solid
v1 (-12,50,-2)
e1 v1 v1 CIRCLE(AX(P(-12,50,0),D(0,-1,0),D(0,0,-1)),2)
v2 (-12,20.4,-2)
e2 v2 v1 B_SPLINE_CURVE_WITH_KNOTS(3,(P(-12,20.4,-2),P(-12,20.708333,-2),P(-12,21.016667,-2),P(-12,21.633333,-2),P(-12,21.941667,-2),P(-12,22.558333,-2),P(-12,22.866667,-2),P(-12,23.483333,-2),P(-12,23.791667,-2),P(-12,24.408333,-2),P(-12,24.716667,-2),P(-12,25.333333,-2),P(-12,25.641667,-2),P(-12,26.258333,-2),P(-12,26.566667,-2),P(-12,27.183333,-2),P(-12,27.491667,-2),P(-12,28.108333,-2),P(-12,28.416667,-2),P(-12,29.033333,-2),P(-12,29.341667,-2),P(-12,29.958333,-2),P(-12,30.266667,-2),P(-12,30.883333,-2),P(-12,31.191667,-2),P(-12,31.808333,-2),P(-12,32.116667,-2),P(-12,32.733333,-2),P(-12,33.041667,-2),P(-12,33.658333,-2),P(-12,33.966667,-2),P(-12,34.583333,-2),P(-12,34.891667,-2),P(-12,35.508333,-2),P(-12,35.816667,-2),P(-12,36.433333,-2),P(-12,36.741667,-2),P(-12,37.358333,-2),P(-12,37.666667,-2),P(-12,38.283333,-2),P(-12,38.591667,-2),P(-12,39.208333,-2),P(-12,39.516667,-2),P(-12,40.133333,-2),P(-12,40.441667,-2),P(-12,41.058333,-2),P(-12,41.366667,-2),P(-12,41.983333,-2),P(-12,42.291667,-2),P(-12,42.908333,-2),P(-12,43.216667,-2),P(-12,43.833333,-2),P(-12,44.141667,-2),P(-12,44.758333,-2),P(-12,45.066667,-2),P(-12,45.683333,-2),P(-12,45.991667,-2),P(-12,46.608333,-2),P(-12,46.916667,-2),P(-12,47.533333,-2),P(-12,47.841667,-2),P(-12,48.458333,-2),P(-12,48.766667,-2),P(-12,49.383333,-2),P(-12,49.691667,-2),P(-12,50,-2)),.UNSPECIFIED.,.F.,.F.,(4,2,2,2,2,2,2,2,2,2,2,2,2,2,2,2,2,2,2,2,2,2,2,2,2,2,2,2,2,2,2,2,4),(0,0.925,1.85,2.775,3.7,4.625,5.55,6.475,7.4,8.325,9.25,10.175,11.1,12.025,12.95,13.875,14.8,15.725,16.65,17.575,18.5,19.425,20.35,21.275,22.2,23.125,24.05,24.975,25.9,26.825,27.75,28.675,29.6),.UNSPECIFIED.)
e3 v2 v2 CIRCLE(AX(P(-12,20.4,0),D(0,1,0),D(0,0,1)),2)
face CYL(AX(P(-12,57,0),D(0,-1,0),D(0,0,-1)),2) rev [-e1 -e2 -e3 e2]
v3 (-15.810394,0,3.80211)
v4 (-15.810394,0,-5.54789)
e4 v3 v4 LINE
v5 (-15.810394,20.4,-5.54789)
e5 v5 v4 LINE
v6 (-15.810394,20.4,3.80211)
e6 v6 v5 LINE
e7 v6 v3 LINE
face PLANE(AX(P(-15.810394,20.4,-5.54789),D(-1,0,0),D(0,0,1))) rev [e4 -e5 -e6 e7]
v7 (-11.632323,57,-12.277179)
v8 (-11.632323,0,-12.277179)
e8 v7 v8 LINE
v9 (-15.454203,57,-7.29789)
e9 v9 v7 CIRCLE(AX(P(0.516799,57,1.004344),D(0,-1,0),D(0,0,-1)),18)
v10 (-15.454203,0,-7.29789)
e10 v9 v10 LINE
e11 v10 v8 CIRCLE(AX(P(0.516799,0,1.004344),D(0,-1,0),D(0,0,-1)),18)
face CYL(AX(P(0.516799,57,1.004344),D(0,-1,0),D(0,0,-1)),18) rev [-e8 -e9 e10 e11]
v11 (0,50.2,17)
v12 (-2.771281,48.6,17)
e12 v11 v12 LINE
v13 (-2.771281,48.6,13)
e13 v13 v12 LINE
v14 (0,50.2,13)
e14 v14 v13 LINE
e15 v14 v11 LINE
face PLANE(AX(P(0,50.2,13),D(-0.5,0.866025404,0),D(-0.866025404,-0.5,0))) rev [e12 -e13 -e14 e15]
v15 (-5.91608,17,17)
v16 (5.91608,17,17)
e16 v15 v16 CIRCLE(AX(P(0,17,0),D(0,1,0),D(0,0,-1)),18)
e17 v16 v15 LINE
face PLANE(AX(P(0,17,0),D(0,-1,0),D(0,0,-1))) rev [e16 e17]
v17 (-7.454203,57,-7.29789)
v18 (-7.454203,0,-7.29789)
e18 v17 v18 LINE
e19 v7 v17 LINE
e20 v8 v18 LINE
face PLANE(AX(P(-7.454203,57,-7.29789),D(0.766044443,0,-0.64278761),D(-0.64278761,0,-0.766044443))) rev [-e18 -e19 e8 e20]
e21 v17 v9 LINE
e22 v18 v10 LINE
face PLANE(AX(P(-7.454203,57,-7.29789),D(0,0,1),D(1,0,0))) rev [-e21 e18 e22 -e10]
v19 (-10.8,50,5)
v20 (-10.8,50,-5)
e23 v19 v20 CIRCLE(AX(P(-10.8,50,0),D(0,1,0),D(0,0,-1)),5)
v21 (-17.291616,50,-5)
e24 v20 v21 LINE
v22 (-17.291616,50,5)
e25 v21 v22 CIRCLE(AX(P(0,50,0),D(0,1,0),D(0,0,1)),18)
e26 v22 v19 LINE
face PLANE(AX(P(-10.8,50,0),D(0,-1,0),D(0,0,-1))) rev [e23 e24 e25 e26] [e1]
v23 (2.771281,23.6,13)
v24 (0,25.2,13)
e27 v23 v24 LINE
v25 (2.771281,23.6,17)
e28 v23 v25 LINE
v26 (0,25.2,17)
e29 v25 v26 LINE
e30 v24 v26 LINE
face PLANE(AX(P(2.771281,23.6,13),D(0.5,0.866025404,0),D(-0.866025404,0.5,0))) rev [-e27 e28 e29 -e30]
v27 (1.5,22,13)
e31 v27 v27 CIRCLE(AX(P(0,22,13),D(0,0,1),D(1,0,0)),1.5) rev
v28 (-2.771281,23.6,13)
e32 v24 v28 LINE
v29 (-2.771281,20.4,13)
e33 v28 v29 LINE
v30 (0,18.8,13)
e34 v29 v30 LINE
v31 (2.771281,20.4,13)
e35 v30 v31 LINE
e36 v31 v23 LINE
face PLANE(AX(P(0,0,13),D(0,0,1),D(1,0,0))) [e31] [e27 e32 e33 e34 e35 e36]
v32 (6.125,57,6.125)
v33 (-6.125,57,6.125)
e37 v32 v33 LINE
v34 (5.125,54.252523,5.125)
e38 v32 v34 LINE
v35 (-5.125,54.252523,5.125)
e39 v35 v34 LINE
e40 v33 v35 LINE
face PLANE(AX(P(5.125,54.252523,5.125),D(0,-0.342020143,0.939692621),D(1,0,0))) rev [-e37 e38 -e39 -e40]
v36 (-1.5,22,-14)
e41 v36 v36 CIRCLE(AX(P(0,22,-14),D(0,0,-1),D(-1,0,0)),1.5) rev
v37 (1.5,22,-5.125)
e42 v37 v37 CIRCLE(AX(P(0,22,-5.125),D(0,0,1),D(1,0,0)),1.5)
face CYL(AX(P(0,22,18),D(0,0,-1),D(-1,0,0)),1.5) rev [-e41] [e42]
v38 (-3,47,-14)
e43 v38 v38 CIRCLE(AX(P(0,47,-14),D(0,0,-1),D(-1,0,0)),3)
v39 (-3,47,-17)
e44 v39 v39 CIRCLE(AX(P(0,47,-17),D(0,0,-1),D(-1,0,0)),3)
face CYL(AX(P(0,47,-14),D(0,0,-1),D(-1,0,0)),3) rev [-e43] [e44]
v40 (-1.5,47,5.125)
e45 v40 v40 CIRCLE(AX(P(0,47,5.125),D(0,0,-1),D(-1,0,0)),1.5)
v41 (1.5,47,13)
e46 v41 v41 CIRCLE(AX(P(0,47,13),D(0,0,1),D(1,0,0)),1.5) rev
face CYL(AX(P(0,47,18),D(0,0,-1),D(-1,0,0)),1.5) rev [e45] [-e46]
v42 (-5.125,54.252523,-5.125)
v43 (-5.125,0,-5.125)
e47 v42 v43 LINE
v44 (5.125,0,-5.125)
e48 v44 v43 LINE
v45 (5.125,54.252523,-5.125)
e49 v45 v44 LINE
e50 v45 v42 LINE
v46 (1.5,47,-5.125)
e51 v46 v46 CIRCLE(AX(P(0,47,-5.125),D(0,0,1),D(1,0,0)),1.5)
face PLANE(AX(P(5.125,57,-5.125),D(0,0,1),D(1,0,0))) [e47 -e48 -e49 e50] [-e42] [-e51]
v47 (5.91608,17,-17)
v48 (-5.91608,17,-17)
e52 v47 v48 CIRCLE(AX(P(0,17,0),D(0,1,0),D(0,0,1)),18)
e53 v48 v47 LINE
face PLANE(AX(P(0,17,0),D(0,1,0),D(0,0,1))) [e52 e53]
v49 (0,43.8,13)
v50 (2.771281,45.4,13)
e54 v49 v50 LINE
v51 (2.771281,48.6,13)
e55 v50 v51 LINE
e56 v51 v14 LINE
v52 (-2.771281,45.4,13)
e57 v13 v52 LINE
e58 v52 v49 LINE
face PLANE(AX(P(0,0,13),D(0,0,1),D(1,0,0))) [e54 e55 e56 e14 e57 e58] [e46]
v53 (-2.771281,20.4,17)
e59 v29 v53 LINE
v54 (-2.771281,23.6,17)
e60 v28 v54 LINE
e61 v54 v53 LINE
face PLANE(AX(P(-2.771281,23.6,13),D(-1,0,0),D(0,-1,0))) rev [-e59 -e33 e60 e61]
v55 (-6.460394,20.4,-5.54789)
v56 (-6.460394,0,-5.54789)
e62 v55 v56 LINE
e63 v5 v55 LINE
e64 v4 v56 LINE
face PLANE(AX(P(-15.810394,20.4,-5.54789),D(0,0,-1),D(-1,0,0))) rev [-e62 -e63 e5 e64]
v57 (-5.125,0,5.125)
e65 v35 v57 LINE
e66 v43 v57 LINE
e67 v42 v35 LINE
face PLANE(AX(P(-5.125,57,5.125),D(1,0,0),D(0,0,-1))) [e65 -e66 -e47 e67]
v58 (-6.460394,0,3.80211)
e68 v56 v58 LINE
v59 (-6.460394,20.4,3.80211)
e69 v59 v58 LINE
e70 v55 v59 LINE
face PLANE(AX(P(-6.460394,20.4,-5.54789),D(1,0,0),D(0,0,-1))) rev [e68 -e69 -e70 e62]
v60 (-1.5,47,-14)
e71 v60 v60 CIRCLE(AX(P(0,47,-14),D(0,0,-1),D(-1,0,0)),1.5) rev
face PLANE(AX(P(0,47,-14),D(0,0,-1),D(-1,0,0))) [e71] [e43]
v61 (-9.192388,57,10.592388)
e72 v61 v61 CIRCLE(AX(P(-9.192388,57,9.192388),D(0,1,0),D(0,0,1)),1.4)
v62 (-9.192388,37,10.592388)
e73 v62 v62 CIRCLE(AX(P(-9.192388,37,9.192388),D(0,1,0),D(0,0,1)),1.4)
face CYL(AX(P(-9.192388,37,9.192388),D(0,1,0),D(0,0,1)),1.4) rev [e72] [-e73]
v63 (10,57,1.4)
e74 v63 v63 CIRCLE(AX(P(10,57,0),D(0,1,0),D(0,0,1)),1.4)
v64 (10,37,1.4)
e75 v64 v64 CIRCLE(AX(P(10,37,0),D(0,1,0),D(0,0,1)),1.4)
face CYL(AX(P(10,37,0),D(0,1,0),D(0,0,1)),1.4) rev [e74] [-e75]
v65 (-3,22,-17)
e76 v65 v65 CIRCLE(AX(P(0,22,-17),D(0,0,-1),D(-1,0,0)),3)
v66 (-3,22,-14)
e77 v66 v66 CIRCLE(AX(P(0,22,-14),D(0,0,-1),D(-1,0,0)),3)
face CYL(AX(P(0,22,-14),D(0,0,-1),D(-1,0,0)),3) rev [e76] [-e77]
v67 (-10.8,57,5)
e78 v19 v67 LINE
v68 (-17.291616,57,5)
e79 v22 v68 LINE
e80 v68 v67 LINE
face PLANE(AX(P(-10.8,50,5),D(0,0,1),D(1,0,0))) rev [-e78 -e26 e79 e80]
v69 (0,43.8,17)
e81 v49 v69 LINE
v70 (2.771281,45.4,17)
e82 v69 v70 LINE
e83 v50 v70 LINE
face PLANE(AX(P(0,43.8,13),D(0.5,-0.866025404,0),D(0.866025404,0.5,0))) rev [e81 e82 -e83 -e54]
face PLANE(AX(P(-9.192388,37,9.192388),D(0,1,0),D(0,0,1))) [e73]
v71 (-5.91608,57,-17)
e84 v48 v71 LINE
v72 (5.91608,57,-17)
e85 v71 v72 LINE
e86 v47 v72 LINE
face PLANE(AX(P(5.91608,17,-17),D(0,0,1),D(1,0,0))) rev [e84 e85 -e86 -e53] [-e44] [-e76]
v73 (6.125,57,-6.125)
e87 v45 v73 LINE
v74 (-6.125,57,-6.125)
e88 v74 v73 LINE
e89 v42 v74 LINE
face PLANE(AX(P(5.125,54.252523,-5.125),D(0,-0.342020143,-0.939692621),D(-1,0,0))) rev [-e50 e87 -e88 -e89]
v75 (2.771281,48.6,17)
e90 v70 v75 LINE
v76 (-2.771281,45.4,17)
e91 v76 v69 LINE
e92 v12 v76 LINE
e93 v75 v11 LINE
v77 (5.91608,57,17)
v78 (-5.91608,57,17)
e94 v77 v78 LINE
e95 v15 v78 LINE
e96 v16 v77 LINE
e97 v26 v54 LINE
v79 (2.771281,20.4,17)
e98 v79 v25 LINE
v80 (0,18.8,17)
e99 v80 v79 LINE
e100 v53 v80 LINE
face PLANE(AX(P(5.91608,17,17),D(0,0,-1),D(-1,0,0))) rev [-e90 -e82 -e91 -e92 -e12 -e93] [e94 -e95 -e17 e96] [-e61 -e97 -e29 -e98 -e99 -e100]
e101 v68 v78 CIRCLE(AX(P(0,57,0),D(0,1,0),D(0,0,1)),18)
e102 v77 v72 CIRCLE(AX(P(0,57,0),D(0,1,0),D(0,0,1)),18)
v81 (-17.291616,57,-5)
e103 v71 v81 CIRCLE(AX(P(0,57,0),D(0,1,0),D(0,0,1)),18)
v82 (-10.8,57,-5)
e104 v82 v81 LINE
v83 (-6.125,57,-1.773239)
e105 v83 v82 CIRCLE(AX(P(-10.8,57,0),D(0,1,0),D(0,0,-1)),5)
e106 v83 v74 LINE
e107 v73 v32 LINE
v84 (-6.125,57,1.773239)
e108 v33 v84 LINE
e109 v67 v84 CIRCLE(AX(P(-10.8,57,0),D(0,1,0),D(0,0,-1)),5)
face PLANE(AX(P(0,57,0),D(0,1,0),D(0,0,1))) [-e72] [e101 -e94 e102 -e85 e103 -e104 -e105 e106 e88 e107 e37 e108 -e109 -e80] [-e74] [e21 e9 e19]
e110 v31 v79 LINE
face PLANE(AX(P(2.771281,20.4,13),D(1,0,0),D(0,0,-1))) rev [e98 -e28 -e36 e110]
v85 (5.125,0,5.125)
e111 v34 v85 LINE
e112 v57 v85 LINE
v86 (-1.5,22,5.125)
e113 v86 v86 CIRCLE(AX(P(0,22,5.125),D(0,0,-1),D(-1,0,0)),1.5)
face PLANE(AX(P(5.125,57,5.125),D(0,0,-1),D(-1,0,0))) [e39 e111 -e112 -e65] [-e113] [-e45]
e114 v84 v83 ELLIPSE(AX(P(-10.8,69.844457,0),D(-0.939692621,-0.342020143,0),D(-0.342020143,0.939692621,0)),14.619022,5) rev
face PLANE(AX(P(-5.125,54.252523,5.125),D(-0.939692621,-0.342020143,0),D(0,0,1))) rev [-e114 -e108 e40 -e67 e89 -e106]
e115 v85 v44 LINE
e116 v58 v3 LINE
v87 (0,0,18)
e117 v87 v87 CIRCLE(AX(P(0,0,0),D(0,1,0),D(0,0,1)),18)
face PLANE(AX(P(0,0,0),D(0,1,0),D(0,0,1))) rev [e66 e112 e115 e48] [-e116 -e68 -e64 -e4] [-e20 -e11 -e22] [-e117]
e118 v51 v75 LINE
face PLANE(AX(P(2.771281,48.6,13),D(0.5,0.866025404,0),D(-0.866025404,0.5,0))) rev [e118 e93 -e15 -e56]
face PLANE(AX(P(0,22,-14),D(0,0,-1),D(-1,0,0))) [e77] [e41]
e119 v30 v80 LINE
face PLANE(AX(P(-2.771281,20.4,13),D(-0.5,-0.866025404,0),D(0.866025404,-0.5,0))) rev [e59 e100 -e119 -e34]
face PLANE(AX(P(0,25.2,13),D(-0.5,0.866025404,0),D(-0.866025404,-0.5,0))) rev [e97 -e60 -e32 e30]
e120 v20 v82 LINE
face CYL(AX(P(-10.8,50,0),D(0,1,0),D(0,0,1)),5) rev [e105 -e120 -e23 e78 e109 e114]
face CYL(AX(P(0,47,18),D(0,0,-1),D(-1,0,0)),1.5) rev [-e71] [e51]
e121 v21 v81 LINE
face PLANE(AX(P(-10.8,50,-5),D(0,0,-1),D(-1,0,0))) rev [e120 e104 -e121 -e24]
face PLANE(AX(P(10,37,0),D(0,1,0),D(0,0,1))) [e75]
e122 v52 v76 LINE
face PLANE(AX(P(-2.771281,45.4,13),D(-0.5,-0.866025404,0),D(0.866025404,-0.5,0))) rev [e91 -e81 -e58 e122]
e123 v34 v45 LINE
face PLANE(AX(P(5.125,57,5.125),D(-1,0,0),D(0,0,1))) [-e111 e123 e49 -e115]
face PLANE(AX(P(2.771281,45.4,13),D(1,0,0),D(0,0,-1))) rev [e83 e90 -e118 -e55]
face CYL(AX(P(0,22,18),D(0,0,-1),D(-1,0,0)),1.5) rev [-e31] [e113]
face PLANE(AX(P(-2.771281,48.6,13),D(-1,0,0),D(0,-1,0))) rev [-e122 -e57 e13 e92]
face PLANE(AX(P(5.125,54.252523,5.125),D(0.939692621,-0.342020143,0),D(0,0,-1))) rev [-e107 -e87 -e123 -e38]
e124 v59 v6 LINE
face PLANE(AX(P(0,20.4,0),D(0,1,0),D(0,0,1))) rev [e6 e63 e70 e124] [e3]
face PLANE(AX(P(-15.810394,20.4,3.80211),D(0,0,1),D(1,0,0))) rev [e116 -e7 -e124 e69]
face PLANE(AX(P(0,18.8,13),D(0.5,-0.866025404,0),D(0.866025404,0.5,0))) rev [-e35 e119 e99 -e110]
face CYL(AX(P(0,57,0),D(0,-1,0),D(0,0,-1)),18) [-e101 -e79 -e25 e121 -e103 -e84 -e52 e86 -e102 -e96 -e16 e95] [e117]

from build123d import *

# Parameters (mm, degrees)
SKETCH1_R           = 18
SKETCH1_R_2         = 2
SKETCH1_W           = 10.25
SKETCH1_H           = 10.25
BOSS_EXTRUDE1_DEPTH = 57
CUT_EXTRUDE1_START  = -7
CUT_EXTRUDE1_DEPTH  = 7
SKETCH4_W           = 9.35
SKETCH4_H           = 9.35
CUT_EXTRUDE3_DEPTH  = 20.4
CUT_EXTRUDE4_START  = -40
CUT_EXTRUDE4_DEPTH  = 40
SKETCH6_R           = 1.5
CUT_EXTRUDE5_DEPTH  = 70.267597042
SKETCH7_R           = 3
CUT_EXTRUDE6_DEPTH  = 3
CUT_EXTRUDE7_DEPTH  = 4
CHAMFER1_SIZE       = 1
CHAMFER1_SIZE_2     = 2.747477419
CUT_EXTRUDE8_DEPTH  = 63.42595614
SKETCH12_R          = 1.4
CUT_EXTRUDE10_DEPTH = 20


with BuildPart() as part:
    # Sketch1 → Boss-Extrude1 (new body)
    with BuildSketch(Plane(origin=(0, 0, 0), x_dir=(1, 0, 0), z_dir=(0, 1, 0))):
        with Locations(Location((0, 0, 0), (0, 0, 90))):
            Circle(SKETCH1_R)
        with Locations(Location((-12, 0, 0), (0, 0, 90))):
            Circle(SKETCH1_R_2, mode=Mode.SUBTRACT)
        Rectangle(SKETCH1_W, SKETCH1_H, mode=Mode.SUBTRACT)
    extrude(amount=BOSS_EXTRUDE1_DEPTH)

    # Sketch2 → Cut-Extrude1 (cut)
    with BuildSketch(Plane(origin=(0, 57, 0), x_dir=(1, 0, 0), z_dir=(0, 1, 0)).offset(CUT_EXTRUDE1_START)):
        with BuildLine():
            Line((-10.8, 5), (-17.291616466, 5))
            ThreePointArc((-17.291616466, 5), (-18, 0), (-17.291616466, -5))
            Line((-17.291616466, -5), (-10.8, -5))
            ThreePointArc((-10.8, -5), (-5.8, 0), (-10.8, 5))
        make_face()
    extrude(amount=CUT_EXTRUDE1_DEPTH, mode=Mode.SUBTRACT)

    # Sketch4 → Cut-Extrude3 (cut)
    with BuildSketch(Plane(origin=(0, 0, 0), x_dir=(-1, 0, 0), z_dir=(0, -1, 0))):
        with Locations((11.135393506, 0.872889968)):
            Rectangle(SKETCH4_W, SKETCH4_H)
    extrude(amount=-CUT_EXTRUDE3_DEPTH, mode=Mode.SUBTRACT)

    # Sketch5 → Cut-Extrude4 (cut)
    with BuildSketch(Plane(origin=(0, 57, 0), x_dir=(1, 0, 0), z_dir=(0, 1, 0)).offset(CUT_EXTRUDE4_START)):
        with BuildLine():
            Line((5.916079783, 17), (-5.916079783, 17))
            ThreePointArc((-5.916079783, 17), (0, 18), (5.916079783, 17))
        make_face()
        with BuildLine():
            Line((5.916079783, -17), (-5.916079783, -17))
            ThreePointArc((-5.916079783, -17), (0, -18), (5.916079783, -17))
        make_face()
    extrude(amount=CUT_EXTRUDE4_DEPTH, mode=Mode.SUBTRACT)

    # Sketch6 → Cut-Extrude5 (cut, through all)
    with BuildSketch(Plane(origin=(0, 0, -17), x_dir=(-1, 0, 0), z_dir=(0, 0, -1))):
        with Locations((0, 47)):
            Circle(SKETCH6_R)
        with Locations((0, 22)):
            Circle(SKETCH6_R)
    extrude(amount=-CUT_EXTRUDE5_DEPTH, mode=Mode.SUBTRACT)

    # Sketch7 → Cut-Extrude6 (cut)
    with BuildSketch(Plane(origin=(0, 0, -17), x_dir=(-1, 0, 0), z_dir=(0, 0, -1))):
        with Locations((0, 47)):
            Circle(SKETCH7_R)
        with Locations((0, 22)):
            Circle(SKETCH7_R)
    extrude(amount=-CUT_EXTRUDE6_DEPTH, mode=Mode.SUBTRACT)

    # Sketch8 → Cut-Extrude7 (cut)
    with BuildSketch(Plane.XY.offset(17)):
        Polygon((0, 43.8), (2.771281292, 45.4), (2.771281292, 48.6), (0, 50.2), (-2.771281292, 48.6), (-2.771281292, 45.4), align=None)
        Polygon((0, 18.8), (2.771281292, 20.4), (2.771281292, 23.6), (0, 25.2), (-2.771281292, 23.6), (-2.771281292, 20.4), align=None)
    extrude(amount=-CUT_EXTRUDE7_DEPTH, mode=Mode.SUBTRACT)

    # Chamfer1
    # the kernel refuses this chamfer: 2.747477419, 1 mm, written as the material it takes off along each edge
    with BuildSketch(Plane(origin=(-5.125, 57, -5.125), x_dir=(0, 0.09904090225204956, -0.9950833631817488), z_dir=(1, 0, 0)), Plane(origin=(-5.125, 57, 5.125), x_dir=(-0.9950833631817488, 0.09904090225204956, 0), z_dir=(0, 0, -1)), Plane(origin=(5.125, 57, 5.125), x_dir=(0, 0.09904090225204956, 0.9950833631817488), z_dir=(-1, 0, 0)), Plane(origin=(5.125, 57, -5.125), x_dir=(0.9950833631817488, 0.09904090225204956, 0), z_dir=(0, 0, 1))) as chamfer1_piece_1:
        Polygon((CHAMFER1_SIZE * 0.995083363182, -CHAMFER1_SIZE * 0.099040902252), (-CHAMFER1_SIZE_2 * 0.0990409022684, -CHAMFER1_SIZE_2 * 0.995083363346), (0, 0), align=None)
    extrude(amount=10.25, mode=Mode.SUBTRACT)
    with BuildSketch(Plane(origin=(-5.125, 57, 5.125), x_dir=(-0.9950833631817488, 0.09904090225204956, 0), z_dir=(0, 0, -1))) as chamfer1_piece_2a_section:
        Polygon((CHAMFER1_SIZE * 0.995083363182, -CHAMFER1_SIZE * 0.099040902252), (-CHAMFER1_SIZE_2 * 0.0990409022684, -CHAMFER1_SIZE_2 * 0.995083363346), (0, 0), align=None)
    chamfer1_piece_2a = extrude(amount=17.377491449, mode=Mode.PRIVATE)
    chamfer1_piece_2a = split(chamfer1_piece_2a, bisect_by=Plane(origin=(-5.432505006, 56.059901151, -5.125), z_dir=(0, 0, -1)), keep=Keep.TOP, mode=Mode.PRIVATE)
    with BuildSketch(Plane(origin=(-12.252491449, 57, -5.125), x_dir=(0, 0.09904090225204956, -0.9950833631817488), z_dir=(1, 0, 0))) as chamfer1_piece_2b_section:
        Polygon((CHAMFER1_SIZE * 0.995083363182, -CHAMFER1_SIZE * 0.099040902252), (-CHAMFER1_SIZE_2 * 0.0990409022684, -CHAMFER1_SIZE_2 * 0.995083363346), (0, 0), align=None)
    chamfer1_piece_2b = extrude(amount=17.377491449, mode=Mode.PRIVATE)
    chamfer1_piece_2b = split(chamfer1_piece_2b, bisect_by=Plane(origin=(-5.125, 56.059901151, -5.432505006), z_dir=(-1, 0, 0)), keep=Keep.TOP, mode=Mode.PRIVATE)
    chamfer1_piece_2 = chamfer1_piece_2a & chamfer1_piece_2b
    add(chamfer1_piece_2, mode=Mode.SUBTRACT)
    with BuildSketch(Plane(origin=(5.125, 57, -12.252491449), x_dir=(0.9950833631817488, 0.09904090225204956, 0), z_dir=(0, 0, 1))) as chamfer1_piece_3a_section:
        Polygon((CHAMFER1_SIZE * 0.995083363182, -CHAMFER1_SIZE * 0.099040902252), (-CHAMFER1_SIZE_2 * 0.0990409022684, -CHAMFER1_SIZE_2 * 0.995083363346), (0, 0), align=None)
    chamfer1_piece_3a = extrude(amount=17.377491449, mode=Mode.PRIVATE)
    chamfer1_piece_3a = split(chamfer1_piece_3a, bisect_by=Plane(origin=(5.432505006, 56.059901151, -5.125), z_dir=(0, 0, -1)), keep=Keep.TOP, mode=Mode.PRIVATE)
    with BuildSketch(Plane(origin=(-5.125, 57, -5.125), x_dir=(0, 0.09904090225204956, -0.9950833631817488), z_dir=(1, 0, 0))) as chamfer1_piece_3b_section:
        Polygon((CHAMFER1_SIZE * 0.995083363182, -CHAMFER1_SIZE * 0.099040902252), (-CHAMFER1_SIZE_2 * 0.0990409022684, -CHAMFER1_SIZE_2 * 0.995083363346), (0, 0), align=None)
    chamfer1_piece_3b = extrude(amount=17.377491449, mode=Mode.PRIVATE)
    chamfer1_piece_3b = split(chamfer1_piece_3b, bisect_by=Plane(origin=(5.125, 56.059901151, -5.432505006), z_dir=(1, 0, 0)), keep=Keep.TOP, mode=Mode.PRIVATE)
    chamfer1_piece_3 = chamfer1_piece_3a & chamfer1_piece_3b
    add(chamfer1_piece_3, mode=Mode.SUBTRACT)
    with BuildSketch(Plane(origin=(5.125, 57, 5.125), x_dir=(0, 0.09904090225204956, 0.9950833631817488), z_dir=(-1, 0, 0))) as chamfer1_piece_4a_section:
        Polygon((CHAMFER1_SIZE * 0.995083363182, -CHAMFER1_SIZE * 0.099040902252), (-CHAMFER1_SIZE_2 * 0.0990409022684, -CHAMFER1_SIZE_2 * 0.995083363346), (0, 0), align=None)
    chamfer1_piece_4a = extrude(amount=17.377491449, mode=Mode.PRIVATE)
    chamfer1_piece_4a = split(chamfer1_piece_4a, bisect_by=Plane(origin=(-5.125, 56.059901151, 5.432505006), z_dir=(-1, 0, 0)), keep=Keep.TOP, mode=Mode.PRIVATE)
    with BuildSketch(Plane(origin=(-5.125, 57, 12.252491449), x_dir=(-0.9950833631817488, 0.09904090225204956, 0), z_dir=(0, 0, -1))) as chamfer1_piece_4b_section:
        Polygon((CHAMFER1_SIZE * 0.995083363182, -CHAMFER1_SIZE * 0.099040902252), (-CHAMFER1_SIZE_2 * 0.0990409022684, -CHAMFER1_SIZE_2 * 0.995083363346), (0, 0), align=None)
    chamfer1_piece_4b = extrude(amount=17.377491449, mode=Mode.PRIVATE)
    chamfer1_piece_4b = split(chamfer1_piece_4b, bisect_by=Plane(origin=(-5.432505006, 56.059901151, 5.125), z_dir=(0, 0, 1)), keep=Keep.TOP, mode=Mode.PRIVATE)
    chamfer1_piece_4 = chamfer1_piece_4a & chamfer1_piece_4b
    add(chamfer1_piece_4, mode=Mode.SUBTRACT)
    with BuildSketch(Plane(origin=(12.252491449, 57, 5.125), x_dir=(0, 0.09904090225204956, 0.9950833631817488), z_dir=(-1, 0, 0))) as chamfer1_piece_5a_section:
        Polygon((CHAMFER1_SIZE * 0.995083363182, -CHAMFER1_SIZE * 0.099040902252), (-CHAMFER1_SIZE_2 * 0.0990409022684, -CHAMFER1_SIZE_2 * 0.995083363346), (0, 0), align=None)
    chamfer1_piece_5a = extrude(amount=17.377491449, mode=Mode.PRIVATE)
    chamfer1_piece_5a = split(chamfer1_piece_5a, bisect_by=Plane(origin=(5.125, 56.059901151, 5.432505006), z_dir=(1, 0, 0)), keep=Keep.TOP, mode=Mode.PRIVATE)
    with BuildSketch(Plane(origin=(5.125, 57, -5.125), x_dir=(0.9950833631817488, 0.09904090225204956, 0), z_dir=(0, 0, 1))) as chamfer1_piece_5b_section:
        Polygon((CHAMFER1_SIZE * 0.995083363182, -CHAMFER1_SIZE * 0.099040902252), (-CHAMFER1_SIZE_2 * 0.0990409022684, -CHAMFER1_SIZE_2 * 0.995083363346), (0, 0), align=None)
    chamfer1_piece_5b = extrude(amount=17.377491449, mode=Mode.PRIVATE)
    chamfer1_piece_5b = split(chamfer1_piece_5b, bisect_by=Plane(origin=(5.432505006, 56.059901151, 5.125), z_dir=(0, 0, 1)), keep=Keep.TOP, mode=Mode.PRIVATE)
    chamfer1_piece_5 = chamfer1_piece_5a & chamfer1_piece_5b
    add(chamfer1_piece_5, mode=Mode.SUBTRACT)

    # Sketch9 → Cut-Extrude8 (cut, through all)
    with BuildSketch(Plane.XZ):
        with BuildLine():
            Line((-7.454203172, -7.297889968), (-15.454203172, -7.297889968))
            ThreePointArc((-15.454203172, -7.297889968), (-13.761984914, -9.955415688), (-11.632322635, -12.277178848))
            Line((-11.632322635, -12.277178848), (-7.454203172, -7.297889968))
        make_face()
    extrude(amount=-CUT_EXTRUDE8_DEPTH, mode=Mode.SUBTRACT)

    # Sketch12 → Cut-Extrude10 (cut)
    with BuildSketch(Plane(origin=(0, 57, 0), x_dir=(1, 0, 0), z_dir=(0, 1, 0))):
        with Locations(Location((10, 0, 0), (0, 0, 270))):
            Circle(SKETCH12_R)
        with Locations(Location((-9.192388155, -9.192388155, 0), (0, 0, 270))):
            Circle(SKETCH12_R)
    extrude(amount=-CUT_EXTRUDE10_DEPTH, mode=Mode.SUBTRACT)


solid = part.part
